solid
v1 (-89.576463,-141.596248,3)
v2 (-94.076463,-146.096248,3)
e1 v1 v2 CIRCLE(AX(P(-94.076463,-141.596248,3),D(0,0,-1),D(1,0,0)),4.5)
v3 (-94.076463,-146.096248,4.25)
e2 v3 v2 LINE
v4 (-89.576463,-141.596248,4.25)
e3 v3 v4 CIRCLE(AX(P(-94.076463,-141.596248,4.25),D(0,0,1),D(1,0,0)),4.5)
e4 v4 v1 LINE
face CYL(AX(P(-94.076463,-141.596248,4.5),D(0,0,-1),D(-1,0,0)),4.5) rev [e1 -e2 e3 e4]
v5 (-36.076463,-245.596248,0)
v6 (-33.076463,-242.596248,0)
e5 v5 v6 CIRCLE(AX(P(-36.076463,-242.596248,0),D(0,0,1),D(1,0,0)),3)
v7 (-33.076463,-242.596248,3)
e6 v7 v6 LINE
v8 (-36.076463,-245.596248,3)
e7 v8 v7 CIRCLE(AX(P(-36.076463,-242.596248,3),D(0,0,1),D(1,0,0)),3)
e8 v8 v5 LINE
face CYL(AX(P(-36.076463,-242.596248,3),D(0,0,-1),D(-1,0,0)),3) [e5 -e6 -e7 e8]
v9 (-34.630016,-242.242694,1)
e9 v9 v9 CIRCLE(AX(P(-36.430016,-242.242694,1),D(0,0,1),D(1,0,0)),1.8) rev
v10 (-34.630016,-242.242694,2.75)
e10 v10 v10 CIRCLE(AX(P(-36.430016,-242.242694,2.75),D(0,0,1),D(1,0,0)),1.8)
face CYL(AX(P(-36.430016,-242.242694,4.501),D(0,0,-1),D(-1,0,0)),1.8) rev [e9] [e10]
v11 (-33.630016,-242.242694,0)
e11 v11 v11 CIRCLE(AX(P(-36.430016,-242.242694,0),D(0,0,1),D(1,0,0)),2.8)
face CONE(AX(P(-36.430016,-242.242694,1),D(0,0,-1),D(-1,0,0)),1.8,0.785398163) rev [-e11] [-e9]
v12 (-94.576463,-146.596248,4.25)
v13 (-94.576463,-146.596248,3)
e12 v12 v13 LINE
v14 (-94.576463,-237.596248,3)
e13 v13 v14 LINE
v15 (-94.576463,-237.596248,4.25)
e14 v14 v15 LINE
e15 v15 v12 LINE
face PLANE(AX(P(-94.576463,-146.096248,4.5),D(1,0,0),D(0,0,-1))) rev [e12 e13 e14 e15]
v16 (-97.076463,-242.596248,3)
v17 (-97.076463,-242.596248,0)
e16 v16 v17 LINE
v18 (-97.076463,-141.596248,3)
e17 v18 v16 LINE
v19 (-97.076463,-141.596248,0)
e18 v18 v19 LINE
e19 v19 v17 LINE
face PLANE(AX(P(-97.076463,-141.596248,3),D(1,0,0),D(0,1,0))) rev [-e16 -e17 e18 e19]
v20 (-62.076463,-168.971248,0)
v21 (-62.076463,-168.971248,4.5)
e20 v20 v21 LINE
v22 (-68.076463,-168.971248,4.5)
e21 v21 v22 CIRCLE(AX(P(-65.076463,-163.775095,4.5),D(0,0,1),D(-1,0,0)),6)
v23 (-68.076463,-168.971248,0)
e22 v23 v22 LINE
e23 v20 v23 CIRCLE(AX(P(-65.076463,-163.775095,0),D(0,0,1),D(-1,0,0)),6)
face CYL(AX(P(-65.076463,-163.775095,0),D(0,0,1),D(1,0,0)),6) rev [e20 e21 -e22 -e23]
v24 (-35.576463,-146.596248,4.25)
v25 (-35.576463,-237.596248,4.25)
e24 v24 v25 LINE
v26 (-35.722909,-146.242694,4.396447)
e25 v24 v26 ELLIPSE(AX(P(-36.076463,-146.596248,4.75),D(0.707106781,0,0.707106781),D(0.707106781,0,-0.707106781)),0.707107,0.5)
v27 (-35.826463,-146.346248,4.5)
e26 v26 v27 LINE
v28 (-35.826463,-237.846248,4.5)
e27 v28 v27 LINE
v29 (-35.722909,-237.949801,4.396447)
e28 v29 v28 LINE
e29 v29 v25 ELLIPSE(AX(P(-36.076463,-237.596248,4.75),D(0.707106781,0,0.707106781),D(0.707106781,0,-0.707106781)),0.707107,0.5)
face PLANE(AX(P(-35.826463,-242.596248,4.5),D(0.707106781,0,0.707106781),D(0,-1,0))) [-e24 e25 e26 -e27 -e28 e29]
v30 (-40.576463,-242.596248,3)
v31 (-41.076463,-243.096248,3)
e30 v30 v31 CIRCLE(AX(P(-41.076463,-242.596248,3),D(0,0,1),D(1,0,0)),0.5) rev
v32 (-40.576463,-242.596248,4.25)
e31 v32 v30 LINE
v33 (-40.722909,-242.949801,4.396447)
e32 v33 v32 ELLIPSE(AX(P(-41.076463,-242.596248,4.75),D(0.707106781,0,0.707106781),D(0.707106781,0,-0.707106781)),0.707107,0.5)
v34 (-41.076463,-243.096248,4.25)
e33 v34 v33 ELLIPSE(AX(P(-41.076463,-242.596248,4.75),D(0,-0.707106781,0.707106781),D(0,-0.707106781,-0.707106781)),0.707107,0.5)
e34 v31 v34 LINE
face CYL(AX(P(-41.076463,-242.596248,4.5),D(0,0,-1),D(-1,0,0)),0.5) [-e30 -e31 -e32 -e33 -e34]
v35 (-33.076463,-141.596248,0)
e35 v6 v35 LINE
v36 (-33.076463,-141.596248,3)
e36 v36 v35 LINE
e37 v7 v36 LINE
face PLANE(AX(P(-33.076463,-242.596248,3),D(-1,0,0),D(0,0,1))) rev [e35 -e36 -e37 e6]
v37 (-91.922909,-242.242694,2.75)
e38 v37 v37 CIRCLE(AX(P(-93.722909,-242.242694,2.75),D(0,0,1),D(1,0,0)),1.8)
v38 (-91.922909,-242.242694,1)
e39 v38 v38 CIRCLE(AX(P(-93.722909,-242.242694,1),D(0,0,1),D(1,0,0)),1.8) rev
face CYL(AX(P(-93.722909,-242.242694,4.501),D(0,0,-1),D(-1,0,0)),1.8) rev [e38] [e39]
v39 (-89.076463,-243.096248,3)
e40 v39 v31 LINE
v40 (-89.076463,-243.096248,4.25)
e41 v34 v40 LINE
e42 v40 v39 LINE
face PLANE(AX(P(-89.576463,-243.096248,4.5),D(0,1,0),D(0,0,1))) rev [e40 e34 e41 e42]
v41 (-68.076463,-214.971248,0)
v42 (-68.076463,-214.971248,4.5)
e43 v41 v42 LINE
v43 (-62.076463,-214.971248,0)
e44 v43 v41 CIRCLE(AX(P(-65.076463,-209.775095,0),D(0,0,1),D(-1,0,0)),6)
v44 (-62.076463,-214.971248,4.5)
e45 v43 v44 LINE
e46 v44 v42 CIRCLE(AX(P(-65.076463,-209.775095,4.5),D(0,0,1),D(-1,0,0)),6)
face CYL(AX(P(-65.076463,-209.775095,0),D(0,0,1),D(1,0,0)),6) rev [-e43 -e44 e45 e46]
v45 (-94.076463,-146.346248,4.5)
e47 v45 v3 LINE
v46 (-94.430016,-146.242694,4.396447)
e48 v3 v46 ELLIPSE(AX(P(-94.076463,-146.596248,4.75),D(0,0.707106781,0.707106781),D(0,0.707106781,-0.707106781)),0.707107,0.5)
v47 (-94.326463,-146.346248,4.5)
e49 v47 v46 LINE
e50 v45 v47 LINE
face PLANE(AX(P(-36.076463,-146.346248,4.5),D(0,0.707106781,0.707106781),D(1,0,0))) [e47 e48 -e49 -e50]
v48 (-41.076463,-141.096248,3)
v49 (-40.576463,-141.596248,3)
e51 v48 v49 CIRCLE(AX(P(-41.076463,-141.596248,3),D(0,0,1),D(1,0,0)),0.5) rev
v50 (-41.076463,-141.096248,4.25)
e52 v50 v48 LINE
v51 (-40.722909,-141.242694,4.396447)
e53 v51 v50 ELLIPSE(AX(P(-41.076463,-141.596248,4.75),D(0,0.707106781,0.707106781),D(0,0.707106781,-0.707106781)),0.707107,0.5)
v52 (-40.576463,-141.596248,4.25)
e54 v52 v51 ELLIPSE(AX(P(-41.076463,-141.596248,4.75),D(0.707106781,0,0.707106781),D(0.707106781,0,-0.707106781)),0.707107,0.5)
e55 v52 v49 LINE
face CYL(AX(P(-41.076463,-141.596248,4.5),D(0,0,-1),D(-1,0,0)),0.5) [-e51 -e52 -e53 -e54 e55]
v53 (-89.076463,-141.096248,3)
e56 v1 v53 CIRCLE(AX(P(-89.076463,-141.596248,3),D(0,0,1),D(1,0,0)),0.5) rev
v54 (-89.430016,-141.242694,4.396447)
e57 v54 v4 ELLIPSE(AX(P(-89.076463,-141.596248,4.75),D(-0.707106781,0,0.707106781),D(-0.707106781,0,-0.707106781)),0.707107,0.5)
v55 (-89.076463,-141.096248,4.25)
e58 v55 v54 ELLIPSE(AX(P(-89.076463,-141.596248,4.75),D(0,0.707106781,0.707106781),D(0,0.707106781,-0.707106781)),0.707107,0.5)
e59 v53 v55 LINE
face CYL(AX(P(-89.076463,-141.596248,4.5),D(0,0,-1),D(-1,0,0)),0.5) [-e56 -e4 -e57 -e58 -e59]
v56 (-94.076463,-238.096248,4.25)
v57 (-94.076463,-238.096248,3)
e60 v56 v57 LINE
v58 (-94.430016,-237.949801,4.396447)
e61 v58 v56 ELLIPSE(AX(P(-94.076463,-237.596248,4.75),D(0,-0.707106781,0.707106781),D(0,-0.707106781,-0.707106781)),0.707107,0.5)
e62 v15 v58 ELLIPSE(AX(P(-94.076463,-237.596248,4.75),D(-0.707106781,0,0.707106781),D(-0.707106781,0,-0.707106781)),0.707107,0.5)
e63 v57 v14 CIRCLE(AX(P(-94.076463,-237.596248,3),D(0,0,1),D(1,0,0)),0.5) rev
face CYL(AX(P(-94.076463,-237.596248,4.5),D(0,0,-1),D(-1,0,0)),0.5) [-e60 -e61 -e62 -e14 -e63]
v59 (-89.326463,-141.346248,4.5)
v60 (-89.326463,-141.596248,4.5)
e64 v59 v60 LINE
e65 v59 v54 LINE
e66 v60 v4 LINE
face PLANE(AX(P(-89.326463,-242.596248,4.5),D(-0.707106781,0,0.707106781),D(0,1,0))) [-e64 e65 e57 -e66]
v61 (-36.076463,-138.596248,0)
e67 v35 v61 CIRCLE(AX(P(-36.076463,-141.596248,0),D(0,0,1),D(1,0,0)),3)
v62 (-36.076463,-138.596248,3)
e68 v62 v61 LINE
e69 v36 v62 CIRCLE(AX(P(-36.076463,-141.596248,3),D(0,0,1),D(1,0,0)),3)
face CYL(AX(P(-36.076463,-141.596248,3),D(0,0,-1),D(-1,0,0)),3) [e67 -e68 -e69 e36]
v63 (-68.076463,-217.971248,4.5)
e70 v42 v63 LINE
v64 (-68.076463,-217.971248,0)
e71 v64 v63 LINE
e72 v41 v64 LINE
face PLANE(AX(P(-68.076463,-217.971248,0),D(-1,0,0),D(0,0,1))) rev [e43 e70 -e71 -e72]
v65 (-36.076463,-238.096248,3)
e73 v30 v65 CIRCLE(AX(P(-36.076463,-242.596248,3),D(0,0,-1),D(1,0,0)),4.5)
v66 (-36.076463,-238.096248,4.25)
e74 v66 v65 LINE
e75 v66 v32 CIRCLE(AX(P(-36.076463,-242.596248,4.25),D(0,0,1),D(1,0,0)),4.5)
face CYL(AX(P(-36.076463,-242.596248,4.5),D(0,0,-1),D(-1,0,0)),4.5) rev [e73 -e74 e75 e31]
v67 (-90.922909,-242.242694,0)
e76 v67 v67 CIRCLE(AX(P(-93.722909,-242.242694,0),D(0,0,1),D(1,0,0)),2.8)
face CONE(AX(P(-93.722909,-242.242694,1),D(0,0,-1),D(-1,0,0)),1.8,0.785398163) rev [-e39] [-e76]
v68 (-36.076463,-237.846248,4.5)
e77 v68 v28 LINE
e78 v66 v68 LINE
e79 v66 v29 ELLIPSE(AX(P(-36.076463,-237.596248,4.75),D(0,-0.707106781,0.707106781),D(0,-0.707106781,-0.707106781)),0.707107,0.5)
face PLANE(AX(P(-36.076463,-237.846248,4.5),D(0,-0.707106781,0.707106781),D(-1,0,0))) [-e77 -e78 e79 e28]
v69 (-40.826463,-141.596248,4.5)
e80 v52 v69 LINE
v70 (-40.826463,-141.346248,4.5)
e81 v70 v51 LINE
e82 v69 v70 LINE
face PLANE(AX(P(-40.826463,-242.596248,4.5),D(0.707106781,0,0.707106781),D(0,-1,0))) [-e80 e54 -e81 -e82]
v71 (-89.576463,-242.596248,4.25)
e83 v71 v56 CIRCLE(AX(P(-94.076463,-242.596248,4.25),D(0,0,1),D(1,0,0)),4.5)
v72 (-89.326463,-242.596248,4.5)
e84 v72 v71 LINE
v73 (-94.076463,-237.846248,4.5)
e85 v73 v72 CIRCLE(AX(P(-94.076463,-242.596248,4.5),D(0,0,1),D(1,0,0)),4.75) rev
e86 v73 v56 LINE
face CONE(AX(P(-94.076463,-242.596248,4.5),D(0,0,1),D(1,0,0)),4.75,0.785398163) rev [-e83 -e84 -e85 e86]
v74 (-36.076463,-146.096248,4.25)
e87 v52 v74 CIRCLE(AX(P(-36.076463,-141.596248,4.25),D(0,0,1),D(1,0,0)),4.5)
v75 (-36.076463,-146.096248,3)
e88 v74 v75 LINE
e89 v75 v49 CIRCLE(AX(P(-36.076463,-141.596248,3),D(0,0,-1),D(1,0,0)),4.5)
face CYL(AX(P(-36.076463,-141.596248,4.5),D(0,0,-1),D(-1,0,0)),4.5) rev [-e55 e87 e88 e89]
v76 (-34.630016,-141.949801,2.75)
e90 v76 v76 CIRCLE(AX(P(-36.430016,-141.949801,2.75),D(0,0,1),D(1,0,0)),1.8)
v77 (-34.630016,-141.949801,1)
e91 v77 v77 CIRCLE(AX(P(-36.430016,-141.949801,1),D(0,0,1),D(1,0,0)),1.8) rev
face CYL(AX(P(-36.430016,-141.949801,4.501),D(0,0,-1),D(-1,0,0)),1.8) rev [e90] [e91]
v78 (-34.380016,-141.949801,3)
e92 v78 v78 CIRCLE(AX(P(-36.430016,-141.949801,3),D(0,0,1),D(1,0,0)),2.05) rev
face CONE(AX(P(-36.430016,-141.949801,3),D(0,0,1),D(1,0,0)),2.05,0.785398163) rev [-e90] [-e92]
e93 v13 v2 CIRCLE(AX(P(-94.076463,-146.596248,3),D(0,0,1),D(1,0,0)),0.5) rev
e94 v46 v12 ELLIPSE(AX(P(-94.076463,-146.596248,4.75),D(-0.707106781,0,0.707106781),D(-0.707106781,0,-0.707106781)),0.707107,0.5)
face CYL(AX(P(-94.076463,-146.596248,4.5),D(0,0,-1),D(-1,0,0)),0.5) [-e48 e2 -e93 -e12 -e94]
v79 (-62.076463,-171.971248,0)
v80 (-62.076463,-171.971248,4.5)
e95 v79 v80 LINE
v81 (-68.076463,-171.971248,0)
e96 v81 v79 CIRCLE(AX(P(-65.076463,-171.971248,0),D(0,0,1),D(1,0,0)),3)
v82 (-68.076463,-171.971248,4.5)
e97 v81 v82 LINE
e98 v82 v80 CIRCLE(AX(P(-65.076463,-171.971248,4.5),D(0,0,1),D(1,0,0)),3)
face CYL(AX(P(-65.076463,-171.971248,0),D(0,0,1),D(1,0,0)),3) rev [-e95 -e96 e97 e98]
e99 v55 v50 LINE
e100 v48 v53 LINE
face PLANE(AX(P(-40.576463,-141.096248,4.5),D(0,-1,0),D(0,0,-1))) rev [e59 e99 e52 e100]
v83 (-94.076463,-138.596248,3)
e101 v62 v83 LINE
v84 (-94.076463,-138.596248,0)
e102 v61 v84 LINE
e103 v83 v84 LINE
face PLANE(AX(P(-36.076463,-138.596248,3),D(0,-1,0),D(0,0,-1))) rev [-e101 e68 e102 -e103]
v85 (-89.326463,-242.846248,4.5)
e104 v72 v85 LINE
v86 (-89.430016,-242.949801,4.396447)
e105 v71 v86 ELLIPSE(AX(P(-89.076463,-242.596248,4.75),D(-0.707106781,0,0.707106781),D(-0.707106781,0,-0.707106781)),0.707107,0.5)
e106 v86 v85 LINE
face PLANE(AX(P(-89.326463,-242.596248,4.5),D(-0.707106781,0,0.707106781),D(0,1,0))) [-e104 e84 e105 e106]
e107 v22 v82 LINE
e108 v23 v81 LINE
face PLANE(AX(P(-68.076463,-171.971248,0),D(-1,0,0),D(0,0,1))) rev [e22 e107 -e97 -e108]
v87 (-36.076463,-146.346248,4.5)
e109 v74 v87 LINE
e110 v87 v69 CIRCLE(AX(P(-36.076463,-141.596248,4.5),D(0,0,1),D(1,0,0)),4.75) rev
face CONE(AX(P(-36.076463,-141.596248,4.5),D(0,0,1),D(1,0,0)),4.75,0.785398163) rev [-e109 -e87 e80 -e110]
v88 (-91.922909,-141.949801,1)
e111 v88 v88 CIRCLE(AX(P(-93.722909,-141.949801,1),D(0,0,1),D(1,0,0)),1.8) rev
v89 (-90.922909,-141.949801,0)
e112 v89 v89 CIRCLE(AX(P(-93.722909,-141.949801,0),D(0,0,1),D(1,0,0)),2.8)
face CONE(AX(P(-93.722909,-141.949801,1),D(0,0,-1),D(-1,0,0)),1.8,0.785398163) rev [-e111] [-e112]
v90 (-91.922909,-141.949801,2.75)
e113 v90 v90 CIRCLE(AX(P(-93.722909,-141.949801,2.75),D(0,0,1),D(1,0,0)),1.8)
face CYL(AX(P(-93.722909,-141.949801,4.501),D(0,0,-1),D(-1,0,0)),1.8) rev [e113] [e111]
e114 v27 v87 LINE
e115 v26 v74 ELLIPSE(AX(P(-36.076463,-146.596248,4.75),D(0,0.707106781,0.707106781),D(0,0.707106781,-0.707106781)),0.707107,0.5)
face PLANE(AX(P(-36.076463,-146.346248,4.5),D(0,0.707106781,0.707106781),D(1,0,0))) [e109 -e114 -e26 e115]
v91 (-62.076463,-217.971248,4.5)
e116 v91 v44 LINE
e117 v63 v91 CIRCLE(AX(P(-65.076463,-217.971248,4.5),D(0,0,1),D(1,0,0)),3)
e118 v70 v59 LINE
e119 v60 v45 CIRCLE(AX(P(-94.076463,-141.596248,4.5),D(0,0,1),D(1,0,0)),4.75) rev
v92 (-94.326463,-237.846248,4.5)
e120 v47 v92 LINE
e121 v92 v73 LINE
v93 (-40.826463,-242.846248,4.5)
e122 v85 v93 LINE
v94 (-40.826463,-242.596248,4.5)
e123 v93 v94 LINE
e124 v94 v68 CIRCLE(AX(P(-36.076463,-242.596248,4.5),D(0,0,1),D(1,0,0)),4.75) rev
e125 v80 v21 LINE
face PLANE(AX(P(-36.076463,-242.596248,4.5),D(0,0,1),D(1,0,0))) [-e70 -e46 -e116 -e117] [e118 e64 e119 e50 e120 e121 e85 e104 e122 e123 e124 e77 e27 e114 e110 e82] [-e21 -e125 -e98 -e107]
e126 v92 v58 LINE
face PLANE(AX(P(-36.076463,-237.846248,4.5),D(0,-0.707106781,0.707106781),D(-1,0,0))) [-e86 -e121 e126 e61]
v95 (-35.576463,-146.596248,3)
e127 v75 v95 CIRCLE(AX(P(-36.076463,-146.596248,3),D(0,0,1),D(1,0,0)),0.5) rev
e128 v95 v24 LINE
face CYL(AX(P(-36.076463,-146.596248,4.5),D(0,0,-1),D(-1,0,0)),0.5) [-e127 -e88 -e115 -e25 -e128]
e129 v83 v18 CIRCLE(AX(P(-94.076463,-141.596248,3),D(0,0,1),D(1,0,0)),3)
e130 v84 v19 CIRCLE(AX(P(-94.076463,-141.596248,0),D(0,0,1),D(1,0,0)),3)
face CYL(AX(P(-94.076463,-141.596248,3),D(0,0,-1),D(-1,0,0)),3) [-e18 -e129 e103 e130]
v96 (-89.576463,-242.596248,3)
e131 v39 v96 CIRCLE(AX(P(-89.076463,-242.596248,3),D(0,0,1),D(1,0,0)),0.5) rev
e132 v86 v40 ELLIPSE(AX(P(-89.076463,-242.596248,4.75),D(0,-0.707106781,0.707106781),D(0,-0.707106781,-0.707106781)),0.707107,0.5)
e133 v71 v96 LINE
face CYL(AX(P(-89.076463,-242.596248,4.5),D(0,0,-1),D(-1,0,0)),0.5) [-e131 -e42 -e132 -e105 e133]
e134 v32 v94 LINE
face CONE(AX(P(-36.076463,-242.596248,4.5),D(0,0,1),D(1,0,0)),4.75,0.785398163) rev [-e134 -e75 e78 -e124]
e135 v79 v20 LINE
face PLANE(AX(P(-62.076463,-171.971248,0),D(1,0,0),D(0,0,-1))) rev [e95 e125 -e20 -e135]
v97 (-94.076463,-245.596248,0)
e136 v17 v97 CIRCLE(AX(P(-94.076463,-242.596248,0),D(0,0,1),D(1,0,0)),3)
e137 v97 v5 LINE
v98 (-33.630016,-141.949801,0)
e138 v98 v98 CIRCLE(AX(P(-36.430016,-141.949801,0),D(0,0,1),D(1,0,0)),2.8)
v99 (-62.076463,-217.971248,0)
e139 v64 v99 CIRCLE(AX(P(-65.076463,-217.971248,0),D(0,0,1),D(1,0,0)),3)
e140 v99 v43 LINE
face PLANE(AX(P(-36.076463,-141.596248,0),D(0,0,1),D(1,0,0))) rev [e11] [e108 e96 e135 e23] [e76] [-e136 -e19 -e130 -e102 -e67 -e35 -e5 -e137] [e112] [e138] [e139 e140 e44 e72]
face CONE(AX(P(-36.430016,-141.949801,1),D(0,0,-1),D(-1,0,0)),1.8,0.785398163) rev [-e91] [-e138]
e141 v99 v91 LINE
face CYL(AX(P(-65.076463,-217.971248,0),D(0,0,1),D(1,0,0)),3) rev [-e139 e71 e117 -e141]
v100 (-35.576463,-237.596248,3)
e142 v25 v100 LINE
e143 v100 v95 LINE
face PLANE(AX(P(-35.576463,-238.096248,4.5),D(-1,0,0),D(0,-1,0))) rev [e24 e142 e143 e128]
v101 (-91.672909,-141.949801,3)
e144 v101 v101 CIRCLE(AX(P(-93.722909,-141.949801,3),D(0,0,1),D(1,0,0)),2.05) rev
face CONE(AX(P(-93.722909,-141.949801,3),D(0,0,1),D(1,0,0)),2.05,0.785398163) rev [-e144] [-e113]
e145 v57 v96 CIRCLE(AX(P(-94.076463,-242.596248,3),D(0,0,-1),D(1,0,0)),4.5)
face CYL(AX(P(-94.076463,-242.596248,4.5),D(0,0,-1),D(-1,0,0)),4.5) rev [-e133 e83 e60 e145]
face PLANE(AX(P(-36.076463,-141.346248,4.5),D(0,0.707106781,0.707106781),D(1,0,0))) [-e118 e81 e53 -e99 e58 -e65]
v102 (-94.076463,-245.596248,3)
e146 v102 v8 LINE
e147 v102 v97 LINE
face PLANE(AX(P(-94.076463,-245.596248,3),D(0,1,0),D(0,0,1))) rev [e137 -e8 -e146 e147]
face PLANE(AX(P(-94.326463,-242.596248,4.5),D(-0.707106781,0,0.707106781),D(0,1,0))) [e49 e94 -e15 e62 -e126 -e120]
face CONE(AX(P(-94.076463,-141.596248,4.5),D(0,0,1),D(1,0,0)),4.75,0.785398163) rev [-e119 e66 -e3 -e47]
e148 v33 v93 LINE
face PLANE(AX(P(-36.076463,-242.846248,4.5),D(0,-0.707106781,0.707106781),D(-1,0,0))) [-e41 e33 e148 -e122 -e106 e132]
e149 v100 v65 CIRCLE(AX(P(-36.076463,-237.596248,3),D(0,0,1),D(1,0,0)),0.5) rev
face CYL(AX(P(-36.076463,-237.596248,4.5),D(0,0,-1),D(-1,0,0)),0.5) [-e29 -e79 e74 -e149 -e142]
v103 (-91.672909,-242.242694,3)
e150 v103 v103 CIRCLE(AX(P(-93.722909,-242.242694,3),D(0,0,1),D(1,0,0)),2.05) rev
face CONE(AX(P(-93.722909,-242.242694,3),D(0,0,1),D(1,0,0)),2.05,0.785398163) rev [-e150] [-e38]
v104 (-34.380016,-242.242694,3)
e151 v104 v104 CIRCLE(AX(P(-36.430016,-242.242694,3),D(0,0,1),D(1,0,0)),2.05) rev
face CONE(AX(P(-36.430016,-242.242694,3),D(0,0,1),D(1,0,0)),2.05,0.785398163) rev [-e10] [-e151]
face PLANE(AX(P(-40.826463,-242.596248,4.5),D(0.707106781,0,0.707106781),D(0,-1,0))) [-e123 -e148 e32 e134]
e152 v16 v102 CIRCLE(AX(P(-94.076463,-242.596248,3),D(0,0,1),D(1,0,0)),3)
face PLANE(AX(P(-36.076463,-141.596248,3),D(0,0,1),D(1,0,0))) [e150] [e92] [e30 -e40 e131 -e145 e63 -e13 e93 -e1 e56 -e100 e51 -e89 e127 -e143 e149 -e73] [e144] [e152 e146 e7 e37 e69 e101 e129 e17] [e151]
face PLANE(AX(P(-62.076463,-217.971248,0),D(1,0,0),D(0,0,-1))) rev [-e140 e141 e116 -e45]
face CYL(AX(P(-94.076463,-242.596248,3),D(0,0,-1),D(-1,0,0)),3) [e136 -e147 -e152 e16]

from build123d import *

# Parameters (mm, degrees)
BOSS_EXTRU_1_DEPTH      = 3
BOSS_EXTRU_2_DEPTH      = 1.5
ENL_V_MAT_EXTRU_1_REACH = 266.124
ESQUISSE7_R             = 1.8
CHANFREIN1_SIZE         = 1
CHANFREIN2_SIZE         = 0.25
CONG_1_R                = 0.5
ENL_V_MAT_EXTRU_2_DEPTH = 265.124225417


with BuildPart() as part:
    # Esquisse1 → Boss.-Extru.1 (new body)
    with BuildSketch(Plane.XY):
        with BuildLine():
            Line((-33.076462524, -242.596247682), (-33.076462524, -141.596247682))
            ThreePointArc((-33.076462524, -141.596247682), (-33.955142181, -139.474927339), (-36.076462524, -138.596247682))
            Line((-36.076462524, -138.596247682), (-94.076462524, -138.596247682))
            ThreePointArc((-94.076462524, -138.596247682), (-96.197782868, -139.474927339), (-97.076462524, -141.596247682))
            Line((-97.076462524, -141.596247682), (-97.076462524, -242.596247682))
            ThreePointArc((-97.076462524, -242.596247682), (-96.197782868, -244.717568026), (-94.076462524, -245.596247682))
            Line((-94.076462524, -245.596247682), (-36.076462524, -245.596247682))
            ThreePointArc((-36.076462524, -245.596247682), (-33.955142181, -244.717568026), (-33.076462524, -242.596247682))
        make_face()
    extrude(amount=BOSS_EXTRU_1_DEPTH)

    # Esquisse5 → Boss.-Extru.2 (add)
    with BuildSketch(Plane.XY.offset(3)):
        with BuildLine():
            Line((-40.576462524, -243.096247682), (-40.576462524, -242.596247682))
            ThreePointArc((-40.576462524, -242.596247682), (-39.25844304, -239.414267167), (-36.076462524, -238.096247682))
            Line((-36.076462524, -238.096247682), (-35.576462524, -238.096247682))
            Line((-35.576462524, -238.096247682), (-35.576462524, -146.096247682))
            Line((-35.576462524, -146.096247682), (-36.076462524, -146.096247682))
            ThreePointArc((-36.076462524, -146.096247682), (-39.25844304, -144.778228198), (-40.576462524, -141.596247682))
            Line((-40.576462524, -141.596247682), (-40.576462524, -141.096247682))
            Line((-40.576462524, -141.096247682), (-89.576462524, -141.096247682))
            Line((-89.576462524, -141.096247682), (-89.576462524, -141.596247682))
            ThreePointArc((-89.576462524, -141.596247682), (-90.894482009, -144.778228198), (-94.076462524, -146.096247682))
            Line((-94.076462524, -146.096247682), (-94.576462524, -146.096247682))
            Line((-94.576462524, -146.096247682), (-94.576462524, -238.096247682))
            Line((-94.576462524, -238.096247682), (-94.076462524, -238.096247682))
            ThreePointArc((-94.076462524, -238.096247682), (-90.894482009, -239.414267167), (-89.576462524, -242.596247682))
            Line((-89.576462524, -242.596247682), (-89.576462524, -243.096247682))
            Line((-89.576462524, -243.096247682), (-40.576462524, -243.096247682))
        make_face()
    extrude(amount=BOSS_EXTRU_2_DEPTH)

    # Esquisse7 → Enlèv. mat.-Extru.1 (cut, up to next)
    with BuildSketch(Plane(origin=(0, 0, 0), x_dir=(-1, 0, 0), z_dir=(0, 0, -1)), mode=Mode.PRIVATE) as enl_v_mat_extru_1_sk1:
        with Locations((93.722909134, -242.242694292)):
            Circle(ESQUISSE7_R)
    enl_v_mat_extru_1_tool1 = extrude(enl_v_mat_extru_1_sk1.sketch, amount=-ENL_V_MAT_EXTRU_1_REACH, mode=Mode.PRIVATE) & part.part
    # Esquisse7 → Enlèv. mat.-Extru.1 (cut, up to next)
    with BuildSketch(Plane(origin=(0, 0, 0), x_dir=(-1, 0, 0), z_dir=(0, 0, -1)), mode=Mode.PRIVATE) as enl_v_mat_extru_1_sk2:
        with Locations((93.722909134, -141.949801073)):
            Circle(ESQUISSE7_R)
    enl_v_mat_extru_1_tool2 = extrude(enl_v_mat_extru_1_sk2.sketch, amount=-ENL_V_MAT_EXTRU_1_REACH, mode=Mode.PRIVATE) & part.part
    # Esquisse7 → Enlèv. mat.-Extru.1 (cut, up to next)
    with BuildSketch(Plane(origin=(0, 0, 0), x_dir=(-1, 0, 0), z_dir=(0, 0, -1)), mode=Mode.PRIVATE) as enl_v_mat_extru_1_sk3:
        with Locations((36.430015915, -141.949801073)):
            Circle(ESQUISSE7_R)
    enl_v_mat_extru_1_tool3 = extrude(enl_v_mat_extru_1_sk3.sketch, amount=-ENL_V_MAT_EXTRU_1_REACH, mode=Mode.PRIVATE) & part.part
    # Esquisse7 → Enlèv. mat.-Extru.1 (cut, up to next)
    with BuildSketch(Plane(origin=(0, 0, 0), x_dir=(-1, 0, 0), z_dir=(0, 0, -1)), mode=Mode.PRIVATE) as enl_v_mat_extru_1_sk4:
        with Locations((36.430015915, -242.242694292)):
            Circle(ESQUISSE7_R)
    enl_v_mat_extru_1_tool4 = extrude(enl_v_mat_extru_1_sk4.sketch, amount=-ENL_V_MAT_EXTRU_1_REACH, mode=Mode.PRIVATE) & part.part
    add(enl_v_mat_extru_1_tool1.solids().sort_by_distance((-93.722909, -242.242694, 0))[0], mode=Mode.SUBTRACT)
    add(enl_v_mat_extru_1_tool2.solids().sort_by_distance((-93.722909, -141.949801, 0))[0], mode=Mode.SUBTRACT)
    add(enl_v_mat_extru_1_tool3.solids().sort_by_distance((-36.430016, -141.949801, 0))[0], mode=Mode.SUBTRACT)
    add(enl_v_mat_extru_1_tool4.solids().sort_by_distance((-36.430016, -242.242694, 0))[0], mode=Mode.SUBTRACT)

    # Chanfrein1
    chanfrein1_edges = [part.edges().sort_by_distance(p)[0] for p in [
        (-91.922909134, -242.242694292, 0),
        (-91.922909134, -141.949801073, 0),
        (-34.630015915, -141.949801073, 0),
        (-34.630015915, -242.242694292, 0),
    ]]
    chamfer(chanfrein1_edges, length=CHANFREIN1_SIZE)

    # Chanfrein2
    chanfrein2_edges = [part.edges().sort_by_distance(p)[0] for p in [
        (-65.076462524, -243.096247682, 4.5),
        (-40.576462524, -242.846247682, 4.5),
        (-39.25844304, -239.414267167, 4.5),
        (-35.826462524, -238.096247682, 4.5),
        (-35.576462524, -192.096247682, 4.5),
        (-35.826462524, -146.096247682, 4.5),
        (-39.25844304, -144.778228198, 4.5),
        (-40.576462524, -141.346247682, 4.5),
        (-65.076462524, -141.096247682, 4.5),
        (-89.576462524, -141.346247682, 4.5),
        (-90.894482009, -144.778228198, 4.5),
        (-94.326462524, -146.096247682, 4.5),
        (-94.576462524, -192.096247682, 4.5),
        (-94.326462524, -238.096247682, 4.5),
        (-90.894482009, -239.414267167, 4.5),
        (-89.576462524, -242.846247682, 4.5),
        (-91.922909134, -242.242694292, 3),
        (-91.922909134, -141.949801073, 3),
        (-34.630015915, -141.949801073, 3),
        (-34.630015915, -242.242694292, 3),
    ]]
    chamfer(chanfrein2_edges, length=CHANFREIN2_SIZE)

    # Congé1
    cong_1_edges = [part.edges().sort_by_distance(p)[0] for p in [
        (-94.576462524, -238.096247682, 3.625),
        (-89.576462524, -243.096247682, 3.625),
        (-35.576462524, -146.096247682, 3.625),
        (-40.576462524, -141.096247682, 3.625),
        (-89.576462524, -141.096247682, 3.625),
        (-94.576462524, -146.096247682, 3.625),
        (-35.576462524, -238.096247682, 3.625),
        (-40.576462524, -243.096247682, 3.625),
    ]]
    fillet(cong_1_edges, radius=CONG_1_R - 0.0001)  # a hair under: the kernel refuses the full size

    # Esquisse8 → Enlèv. mat.-Extru.2 (cut, through all)
    with BuildSketch(Plane.XY.offset(4.5)):
        with BuildLine():
            Line((-68.076462524, -171.971247682), (-68.076462524, -168.971247682))
            ThreePointArc((-68.076462524, -168.971247682), (-65.076462524, -157.77509526), (-62.076462524, -168.971247682))
            Line((-62.076462524, -168.971247682), (-62.076462524, -171.971247682))
            ThreePointArc((-62.076462524, -171.971247682), (-65.076462524, -174.971247682), (-68.076462524, -171.971247682))
        make_face()
        with BuildLine():
            Line((-68.076462524, -217.971247682), (-68.076462524, -214.971247682))
            ThreePointArc((-68.076462524, -214.971247682), (-65.076462524, -203.77509526), (-62.076462524, -214.971247682))
            Line((-62.076462524, -214.971247682), (-62.076462524, -217.971247682))
            ThreePointArc((-62.076462524, -217.971247682), (-65.076462524, -220.971247682), (-68.076462524, -217.971247682))
        make_face()
    extrude(amount=-ENL_V_MAT_EXTRU_2_DEPTH, mode=Mode.SUBTRACT)


solid = part.part
